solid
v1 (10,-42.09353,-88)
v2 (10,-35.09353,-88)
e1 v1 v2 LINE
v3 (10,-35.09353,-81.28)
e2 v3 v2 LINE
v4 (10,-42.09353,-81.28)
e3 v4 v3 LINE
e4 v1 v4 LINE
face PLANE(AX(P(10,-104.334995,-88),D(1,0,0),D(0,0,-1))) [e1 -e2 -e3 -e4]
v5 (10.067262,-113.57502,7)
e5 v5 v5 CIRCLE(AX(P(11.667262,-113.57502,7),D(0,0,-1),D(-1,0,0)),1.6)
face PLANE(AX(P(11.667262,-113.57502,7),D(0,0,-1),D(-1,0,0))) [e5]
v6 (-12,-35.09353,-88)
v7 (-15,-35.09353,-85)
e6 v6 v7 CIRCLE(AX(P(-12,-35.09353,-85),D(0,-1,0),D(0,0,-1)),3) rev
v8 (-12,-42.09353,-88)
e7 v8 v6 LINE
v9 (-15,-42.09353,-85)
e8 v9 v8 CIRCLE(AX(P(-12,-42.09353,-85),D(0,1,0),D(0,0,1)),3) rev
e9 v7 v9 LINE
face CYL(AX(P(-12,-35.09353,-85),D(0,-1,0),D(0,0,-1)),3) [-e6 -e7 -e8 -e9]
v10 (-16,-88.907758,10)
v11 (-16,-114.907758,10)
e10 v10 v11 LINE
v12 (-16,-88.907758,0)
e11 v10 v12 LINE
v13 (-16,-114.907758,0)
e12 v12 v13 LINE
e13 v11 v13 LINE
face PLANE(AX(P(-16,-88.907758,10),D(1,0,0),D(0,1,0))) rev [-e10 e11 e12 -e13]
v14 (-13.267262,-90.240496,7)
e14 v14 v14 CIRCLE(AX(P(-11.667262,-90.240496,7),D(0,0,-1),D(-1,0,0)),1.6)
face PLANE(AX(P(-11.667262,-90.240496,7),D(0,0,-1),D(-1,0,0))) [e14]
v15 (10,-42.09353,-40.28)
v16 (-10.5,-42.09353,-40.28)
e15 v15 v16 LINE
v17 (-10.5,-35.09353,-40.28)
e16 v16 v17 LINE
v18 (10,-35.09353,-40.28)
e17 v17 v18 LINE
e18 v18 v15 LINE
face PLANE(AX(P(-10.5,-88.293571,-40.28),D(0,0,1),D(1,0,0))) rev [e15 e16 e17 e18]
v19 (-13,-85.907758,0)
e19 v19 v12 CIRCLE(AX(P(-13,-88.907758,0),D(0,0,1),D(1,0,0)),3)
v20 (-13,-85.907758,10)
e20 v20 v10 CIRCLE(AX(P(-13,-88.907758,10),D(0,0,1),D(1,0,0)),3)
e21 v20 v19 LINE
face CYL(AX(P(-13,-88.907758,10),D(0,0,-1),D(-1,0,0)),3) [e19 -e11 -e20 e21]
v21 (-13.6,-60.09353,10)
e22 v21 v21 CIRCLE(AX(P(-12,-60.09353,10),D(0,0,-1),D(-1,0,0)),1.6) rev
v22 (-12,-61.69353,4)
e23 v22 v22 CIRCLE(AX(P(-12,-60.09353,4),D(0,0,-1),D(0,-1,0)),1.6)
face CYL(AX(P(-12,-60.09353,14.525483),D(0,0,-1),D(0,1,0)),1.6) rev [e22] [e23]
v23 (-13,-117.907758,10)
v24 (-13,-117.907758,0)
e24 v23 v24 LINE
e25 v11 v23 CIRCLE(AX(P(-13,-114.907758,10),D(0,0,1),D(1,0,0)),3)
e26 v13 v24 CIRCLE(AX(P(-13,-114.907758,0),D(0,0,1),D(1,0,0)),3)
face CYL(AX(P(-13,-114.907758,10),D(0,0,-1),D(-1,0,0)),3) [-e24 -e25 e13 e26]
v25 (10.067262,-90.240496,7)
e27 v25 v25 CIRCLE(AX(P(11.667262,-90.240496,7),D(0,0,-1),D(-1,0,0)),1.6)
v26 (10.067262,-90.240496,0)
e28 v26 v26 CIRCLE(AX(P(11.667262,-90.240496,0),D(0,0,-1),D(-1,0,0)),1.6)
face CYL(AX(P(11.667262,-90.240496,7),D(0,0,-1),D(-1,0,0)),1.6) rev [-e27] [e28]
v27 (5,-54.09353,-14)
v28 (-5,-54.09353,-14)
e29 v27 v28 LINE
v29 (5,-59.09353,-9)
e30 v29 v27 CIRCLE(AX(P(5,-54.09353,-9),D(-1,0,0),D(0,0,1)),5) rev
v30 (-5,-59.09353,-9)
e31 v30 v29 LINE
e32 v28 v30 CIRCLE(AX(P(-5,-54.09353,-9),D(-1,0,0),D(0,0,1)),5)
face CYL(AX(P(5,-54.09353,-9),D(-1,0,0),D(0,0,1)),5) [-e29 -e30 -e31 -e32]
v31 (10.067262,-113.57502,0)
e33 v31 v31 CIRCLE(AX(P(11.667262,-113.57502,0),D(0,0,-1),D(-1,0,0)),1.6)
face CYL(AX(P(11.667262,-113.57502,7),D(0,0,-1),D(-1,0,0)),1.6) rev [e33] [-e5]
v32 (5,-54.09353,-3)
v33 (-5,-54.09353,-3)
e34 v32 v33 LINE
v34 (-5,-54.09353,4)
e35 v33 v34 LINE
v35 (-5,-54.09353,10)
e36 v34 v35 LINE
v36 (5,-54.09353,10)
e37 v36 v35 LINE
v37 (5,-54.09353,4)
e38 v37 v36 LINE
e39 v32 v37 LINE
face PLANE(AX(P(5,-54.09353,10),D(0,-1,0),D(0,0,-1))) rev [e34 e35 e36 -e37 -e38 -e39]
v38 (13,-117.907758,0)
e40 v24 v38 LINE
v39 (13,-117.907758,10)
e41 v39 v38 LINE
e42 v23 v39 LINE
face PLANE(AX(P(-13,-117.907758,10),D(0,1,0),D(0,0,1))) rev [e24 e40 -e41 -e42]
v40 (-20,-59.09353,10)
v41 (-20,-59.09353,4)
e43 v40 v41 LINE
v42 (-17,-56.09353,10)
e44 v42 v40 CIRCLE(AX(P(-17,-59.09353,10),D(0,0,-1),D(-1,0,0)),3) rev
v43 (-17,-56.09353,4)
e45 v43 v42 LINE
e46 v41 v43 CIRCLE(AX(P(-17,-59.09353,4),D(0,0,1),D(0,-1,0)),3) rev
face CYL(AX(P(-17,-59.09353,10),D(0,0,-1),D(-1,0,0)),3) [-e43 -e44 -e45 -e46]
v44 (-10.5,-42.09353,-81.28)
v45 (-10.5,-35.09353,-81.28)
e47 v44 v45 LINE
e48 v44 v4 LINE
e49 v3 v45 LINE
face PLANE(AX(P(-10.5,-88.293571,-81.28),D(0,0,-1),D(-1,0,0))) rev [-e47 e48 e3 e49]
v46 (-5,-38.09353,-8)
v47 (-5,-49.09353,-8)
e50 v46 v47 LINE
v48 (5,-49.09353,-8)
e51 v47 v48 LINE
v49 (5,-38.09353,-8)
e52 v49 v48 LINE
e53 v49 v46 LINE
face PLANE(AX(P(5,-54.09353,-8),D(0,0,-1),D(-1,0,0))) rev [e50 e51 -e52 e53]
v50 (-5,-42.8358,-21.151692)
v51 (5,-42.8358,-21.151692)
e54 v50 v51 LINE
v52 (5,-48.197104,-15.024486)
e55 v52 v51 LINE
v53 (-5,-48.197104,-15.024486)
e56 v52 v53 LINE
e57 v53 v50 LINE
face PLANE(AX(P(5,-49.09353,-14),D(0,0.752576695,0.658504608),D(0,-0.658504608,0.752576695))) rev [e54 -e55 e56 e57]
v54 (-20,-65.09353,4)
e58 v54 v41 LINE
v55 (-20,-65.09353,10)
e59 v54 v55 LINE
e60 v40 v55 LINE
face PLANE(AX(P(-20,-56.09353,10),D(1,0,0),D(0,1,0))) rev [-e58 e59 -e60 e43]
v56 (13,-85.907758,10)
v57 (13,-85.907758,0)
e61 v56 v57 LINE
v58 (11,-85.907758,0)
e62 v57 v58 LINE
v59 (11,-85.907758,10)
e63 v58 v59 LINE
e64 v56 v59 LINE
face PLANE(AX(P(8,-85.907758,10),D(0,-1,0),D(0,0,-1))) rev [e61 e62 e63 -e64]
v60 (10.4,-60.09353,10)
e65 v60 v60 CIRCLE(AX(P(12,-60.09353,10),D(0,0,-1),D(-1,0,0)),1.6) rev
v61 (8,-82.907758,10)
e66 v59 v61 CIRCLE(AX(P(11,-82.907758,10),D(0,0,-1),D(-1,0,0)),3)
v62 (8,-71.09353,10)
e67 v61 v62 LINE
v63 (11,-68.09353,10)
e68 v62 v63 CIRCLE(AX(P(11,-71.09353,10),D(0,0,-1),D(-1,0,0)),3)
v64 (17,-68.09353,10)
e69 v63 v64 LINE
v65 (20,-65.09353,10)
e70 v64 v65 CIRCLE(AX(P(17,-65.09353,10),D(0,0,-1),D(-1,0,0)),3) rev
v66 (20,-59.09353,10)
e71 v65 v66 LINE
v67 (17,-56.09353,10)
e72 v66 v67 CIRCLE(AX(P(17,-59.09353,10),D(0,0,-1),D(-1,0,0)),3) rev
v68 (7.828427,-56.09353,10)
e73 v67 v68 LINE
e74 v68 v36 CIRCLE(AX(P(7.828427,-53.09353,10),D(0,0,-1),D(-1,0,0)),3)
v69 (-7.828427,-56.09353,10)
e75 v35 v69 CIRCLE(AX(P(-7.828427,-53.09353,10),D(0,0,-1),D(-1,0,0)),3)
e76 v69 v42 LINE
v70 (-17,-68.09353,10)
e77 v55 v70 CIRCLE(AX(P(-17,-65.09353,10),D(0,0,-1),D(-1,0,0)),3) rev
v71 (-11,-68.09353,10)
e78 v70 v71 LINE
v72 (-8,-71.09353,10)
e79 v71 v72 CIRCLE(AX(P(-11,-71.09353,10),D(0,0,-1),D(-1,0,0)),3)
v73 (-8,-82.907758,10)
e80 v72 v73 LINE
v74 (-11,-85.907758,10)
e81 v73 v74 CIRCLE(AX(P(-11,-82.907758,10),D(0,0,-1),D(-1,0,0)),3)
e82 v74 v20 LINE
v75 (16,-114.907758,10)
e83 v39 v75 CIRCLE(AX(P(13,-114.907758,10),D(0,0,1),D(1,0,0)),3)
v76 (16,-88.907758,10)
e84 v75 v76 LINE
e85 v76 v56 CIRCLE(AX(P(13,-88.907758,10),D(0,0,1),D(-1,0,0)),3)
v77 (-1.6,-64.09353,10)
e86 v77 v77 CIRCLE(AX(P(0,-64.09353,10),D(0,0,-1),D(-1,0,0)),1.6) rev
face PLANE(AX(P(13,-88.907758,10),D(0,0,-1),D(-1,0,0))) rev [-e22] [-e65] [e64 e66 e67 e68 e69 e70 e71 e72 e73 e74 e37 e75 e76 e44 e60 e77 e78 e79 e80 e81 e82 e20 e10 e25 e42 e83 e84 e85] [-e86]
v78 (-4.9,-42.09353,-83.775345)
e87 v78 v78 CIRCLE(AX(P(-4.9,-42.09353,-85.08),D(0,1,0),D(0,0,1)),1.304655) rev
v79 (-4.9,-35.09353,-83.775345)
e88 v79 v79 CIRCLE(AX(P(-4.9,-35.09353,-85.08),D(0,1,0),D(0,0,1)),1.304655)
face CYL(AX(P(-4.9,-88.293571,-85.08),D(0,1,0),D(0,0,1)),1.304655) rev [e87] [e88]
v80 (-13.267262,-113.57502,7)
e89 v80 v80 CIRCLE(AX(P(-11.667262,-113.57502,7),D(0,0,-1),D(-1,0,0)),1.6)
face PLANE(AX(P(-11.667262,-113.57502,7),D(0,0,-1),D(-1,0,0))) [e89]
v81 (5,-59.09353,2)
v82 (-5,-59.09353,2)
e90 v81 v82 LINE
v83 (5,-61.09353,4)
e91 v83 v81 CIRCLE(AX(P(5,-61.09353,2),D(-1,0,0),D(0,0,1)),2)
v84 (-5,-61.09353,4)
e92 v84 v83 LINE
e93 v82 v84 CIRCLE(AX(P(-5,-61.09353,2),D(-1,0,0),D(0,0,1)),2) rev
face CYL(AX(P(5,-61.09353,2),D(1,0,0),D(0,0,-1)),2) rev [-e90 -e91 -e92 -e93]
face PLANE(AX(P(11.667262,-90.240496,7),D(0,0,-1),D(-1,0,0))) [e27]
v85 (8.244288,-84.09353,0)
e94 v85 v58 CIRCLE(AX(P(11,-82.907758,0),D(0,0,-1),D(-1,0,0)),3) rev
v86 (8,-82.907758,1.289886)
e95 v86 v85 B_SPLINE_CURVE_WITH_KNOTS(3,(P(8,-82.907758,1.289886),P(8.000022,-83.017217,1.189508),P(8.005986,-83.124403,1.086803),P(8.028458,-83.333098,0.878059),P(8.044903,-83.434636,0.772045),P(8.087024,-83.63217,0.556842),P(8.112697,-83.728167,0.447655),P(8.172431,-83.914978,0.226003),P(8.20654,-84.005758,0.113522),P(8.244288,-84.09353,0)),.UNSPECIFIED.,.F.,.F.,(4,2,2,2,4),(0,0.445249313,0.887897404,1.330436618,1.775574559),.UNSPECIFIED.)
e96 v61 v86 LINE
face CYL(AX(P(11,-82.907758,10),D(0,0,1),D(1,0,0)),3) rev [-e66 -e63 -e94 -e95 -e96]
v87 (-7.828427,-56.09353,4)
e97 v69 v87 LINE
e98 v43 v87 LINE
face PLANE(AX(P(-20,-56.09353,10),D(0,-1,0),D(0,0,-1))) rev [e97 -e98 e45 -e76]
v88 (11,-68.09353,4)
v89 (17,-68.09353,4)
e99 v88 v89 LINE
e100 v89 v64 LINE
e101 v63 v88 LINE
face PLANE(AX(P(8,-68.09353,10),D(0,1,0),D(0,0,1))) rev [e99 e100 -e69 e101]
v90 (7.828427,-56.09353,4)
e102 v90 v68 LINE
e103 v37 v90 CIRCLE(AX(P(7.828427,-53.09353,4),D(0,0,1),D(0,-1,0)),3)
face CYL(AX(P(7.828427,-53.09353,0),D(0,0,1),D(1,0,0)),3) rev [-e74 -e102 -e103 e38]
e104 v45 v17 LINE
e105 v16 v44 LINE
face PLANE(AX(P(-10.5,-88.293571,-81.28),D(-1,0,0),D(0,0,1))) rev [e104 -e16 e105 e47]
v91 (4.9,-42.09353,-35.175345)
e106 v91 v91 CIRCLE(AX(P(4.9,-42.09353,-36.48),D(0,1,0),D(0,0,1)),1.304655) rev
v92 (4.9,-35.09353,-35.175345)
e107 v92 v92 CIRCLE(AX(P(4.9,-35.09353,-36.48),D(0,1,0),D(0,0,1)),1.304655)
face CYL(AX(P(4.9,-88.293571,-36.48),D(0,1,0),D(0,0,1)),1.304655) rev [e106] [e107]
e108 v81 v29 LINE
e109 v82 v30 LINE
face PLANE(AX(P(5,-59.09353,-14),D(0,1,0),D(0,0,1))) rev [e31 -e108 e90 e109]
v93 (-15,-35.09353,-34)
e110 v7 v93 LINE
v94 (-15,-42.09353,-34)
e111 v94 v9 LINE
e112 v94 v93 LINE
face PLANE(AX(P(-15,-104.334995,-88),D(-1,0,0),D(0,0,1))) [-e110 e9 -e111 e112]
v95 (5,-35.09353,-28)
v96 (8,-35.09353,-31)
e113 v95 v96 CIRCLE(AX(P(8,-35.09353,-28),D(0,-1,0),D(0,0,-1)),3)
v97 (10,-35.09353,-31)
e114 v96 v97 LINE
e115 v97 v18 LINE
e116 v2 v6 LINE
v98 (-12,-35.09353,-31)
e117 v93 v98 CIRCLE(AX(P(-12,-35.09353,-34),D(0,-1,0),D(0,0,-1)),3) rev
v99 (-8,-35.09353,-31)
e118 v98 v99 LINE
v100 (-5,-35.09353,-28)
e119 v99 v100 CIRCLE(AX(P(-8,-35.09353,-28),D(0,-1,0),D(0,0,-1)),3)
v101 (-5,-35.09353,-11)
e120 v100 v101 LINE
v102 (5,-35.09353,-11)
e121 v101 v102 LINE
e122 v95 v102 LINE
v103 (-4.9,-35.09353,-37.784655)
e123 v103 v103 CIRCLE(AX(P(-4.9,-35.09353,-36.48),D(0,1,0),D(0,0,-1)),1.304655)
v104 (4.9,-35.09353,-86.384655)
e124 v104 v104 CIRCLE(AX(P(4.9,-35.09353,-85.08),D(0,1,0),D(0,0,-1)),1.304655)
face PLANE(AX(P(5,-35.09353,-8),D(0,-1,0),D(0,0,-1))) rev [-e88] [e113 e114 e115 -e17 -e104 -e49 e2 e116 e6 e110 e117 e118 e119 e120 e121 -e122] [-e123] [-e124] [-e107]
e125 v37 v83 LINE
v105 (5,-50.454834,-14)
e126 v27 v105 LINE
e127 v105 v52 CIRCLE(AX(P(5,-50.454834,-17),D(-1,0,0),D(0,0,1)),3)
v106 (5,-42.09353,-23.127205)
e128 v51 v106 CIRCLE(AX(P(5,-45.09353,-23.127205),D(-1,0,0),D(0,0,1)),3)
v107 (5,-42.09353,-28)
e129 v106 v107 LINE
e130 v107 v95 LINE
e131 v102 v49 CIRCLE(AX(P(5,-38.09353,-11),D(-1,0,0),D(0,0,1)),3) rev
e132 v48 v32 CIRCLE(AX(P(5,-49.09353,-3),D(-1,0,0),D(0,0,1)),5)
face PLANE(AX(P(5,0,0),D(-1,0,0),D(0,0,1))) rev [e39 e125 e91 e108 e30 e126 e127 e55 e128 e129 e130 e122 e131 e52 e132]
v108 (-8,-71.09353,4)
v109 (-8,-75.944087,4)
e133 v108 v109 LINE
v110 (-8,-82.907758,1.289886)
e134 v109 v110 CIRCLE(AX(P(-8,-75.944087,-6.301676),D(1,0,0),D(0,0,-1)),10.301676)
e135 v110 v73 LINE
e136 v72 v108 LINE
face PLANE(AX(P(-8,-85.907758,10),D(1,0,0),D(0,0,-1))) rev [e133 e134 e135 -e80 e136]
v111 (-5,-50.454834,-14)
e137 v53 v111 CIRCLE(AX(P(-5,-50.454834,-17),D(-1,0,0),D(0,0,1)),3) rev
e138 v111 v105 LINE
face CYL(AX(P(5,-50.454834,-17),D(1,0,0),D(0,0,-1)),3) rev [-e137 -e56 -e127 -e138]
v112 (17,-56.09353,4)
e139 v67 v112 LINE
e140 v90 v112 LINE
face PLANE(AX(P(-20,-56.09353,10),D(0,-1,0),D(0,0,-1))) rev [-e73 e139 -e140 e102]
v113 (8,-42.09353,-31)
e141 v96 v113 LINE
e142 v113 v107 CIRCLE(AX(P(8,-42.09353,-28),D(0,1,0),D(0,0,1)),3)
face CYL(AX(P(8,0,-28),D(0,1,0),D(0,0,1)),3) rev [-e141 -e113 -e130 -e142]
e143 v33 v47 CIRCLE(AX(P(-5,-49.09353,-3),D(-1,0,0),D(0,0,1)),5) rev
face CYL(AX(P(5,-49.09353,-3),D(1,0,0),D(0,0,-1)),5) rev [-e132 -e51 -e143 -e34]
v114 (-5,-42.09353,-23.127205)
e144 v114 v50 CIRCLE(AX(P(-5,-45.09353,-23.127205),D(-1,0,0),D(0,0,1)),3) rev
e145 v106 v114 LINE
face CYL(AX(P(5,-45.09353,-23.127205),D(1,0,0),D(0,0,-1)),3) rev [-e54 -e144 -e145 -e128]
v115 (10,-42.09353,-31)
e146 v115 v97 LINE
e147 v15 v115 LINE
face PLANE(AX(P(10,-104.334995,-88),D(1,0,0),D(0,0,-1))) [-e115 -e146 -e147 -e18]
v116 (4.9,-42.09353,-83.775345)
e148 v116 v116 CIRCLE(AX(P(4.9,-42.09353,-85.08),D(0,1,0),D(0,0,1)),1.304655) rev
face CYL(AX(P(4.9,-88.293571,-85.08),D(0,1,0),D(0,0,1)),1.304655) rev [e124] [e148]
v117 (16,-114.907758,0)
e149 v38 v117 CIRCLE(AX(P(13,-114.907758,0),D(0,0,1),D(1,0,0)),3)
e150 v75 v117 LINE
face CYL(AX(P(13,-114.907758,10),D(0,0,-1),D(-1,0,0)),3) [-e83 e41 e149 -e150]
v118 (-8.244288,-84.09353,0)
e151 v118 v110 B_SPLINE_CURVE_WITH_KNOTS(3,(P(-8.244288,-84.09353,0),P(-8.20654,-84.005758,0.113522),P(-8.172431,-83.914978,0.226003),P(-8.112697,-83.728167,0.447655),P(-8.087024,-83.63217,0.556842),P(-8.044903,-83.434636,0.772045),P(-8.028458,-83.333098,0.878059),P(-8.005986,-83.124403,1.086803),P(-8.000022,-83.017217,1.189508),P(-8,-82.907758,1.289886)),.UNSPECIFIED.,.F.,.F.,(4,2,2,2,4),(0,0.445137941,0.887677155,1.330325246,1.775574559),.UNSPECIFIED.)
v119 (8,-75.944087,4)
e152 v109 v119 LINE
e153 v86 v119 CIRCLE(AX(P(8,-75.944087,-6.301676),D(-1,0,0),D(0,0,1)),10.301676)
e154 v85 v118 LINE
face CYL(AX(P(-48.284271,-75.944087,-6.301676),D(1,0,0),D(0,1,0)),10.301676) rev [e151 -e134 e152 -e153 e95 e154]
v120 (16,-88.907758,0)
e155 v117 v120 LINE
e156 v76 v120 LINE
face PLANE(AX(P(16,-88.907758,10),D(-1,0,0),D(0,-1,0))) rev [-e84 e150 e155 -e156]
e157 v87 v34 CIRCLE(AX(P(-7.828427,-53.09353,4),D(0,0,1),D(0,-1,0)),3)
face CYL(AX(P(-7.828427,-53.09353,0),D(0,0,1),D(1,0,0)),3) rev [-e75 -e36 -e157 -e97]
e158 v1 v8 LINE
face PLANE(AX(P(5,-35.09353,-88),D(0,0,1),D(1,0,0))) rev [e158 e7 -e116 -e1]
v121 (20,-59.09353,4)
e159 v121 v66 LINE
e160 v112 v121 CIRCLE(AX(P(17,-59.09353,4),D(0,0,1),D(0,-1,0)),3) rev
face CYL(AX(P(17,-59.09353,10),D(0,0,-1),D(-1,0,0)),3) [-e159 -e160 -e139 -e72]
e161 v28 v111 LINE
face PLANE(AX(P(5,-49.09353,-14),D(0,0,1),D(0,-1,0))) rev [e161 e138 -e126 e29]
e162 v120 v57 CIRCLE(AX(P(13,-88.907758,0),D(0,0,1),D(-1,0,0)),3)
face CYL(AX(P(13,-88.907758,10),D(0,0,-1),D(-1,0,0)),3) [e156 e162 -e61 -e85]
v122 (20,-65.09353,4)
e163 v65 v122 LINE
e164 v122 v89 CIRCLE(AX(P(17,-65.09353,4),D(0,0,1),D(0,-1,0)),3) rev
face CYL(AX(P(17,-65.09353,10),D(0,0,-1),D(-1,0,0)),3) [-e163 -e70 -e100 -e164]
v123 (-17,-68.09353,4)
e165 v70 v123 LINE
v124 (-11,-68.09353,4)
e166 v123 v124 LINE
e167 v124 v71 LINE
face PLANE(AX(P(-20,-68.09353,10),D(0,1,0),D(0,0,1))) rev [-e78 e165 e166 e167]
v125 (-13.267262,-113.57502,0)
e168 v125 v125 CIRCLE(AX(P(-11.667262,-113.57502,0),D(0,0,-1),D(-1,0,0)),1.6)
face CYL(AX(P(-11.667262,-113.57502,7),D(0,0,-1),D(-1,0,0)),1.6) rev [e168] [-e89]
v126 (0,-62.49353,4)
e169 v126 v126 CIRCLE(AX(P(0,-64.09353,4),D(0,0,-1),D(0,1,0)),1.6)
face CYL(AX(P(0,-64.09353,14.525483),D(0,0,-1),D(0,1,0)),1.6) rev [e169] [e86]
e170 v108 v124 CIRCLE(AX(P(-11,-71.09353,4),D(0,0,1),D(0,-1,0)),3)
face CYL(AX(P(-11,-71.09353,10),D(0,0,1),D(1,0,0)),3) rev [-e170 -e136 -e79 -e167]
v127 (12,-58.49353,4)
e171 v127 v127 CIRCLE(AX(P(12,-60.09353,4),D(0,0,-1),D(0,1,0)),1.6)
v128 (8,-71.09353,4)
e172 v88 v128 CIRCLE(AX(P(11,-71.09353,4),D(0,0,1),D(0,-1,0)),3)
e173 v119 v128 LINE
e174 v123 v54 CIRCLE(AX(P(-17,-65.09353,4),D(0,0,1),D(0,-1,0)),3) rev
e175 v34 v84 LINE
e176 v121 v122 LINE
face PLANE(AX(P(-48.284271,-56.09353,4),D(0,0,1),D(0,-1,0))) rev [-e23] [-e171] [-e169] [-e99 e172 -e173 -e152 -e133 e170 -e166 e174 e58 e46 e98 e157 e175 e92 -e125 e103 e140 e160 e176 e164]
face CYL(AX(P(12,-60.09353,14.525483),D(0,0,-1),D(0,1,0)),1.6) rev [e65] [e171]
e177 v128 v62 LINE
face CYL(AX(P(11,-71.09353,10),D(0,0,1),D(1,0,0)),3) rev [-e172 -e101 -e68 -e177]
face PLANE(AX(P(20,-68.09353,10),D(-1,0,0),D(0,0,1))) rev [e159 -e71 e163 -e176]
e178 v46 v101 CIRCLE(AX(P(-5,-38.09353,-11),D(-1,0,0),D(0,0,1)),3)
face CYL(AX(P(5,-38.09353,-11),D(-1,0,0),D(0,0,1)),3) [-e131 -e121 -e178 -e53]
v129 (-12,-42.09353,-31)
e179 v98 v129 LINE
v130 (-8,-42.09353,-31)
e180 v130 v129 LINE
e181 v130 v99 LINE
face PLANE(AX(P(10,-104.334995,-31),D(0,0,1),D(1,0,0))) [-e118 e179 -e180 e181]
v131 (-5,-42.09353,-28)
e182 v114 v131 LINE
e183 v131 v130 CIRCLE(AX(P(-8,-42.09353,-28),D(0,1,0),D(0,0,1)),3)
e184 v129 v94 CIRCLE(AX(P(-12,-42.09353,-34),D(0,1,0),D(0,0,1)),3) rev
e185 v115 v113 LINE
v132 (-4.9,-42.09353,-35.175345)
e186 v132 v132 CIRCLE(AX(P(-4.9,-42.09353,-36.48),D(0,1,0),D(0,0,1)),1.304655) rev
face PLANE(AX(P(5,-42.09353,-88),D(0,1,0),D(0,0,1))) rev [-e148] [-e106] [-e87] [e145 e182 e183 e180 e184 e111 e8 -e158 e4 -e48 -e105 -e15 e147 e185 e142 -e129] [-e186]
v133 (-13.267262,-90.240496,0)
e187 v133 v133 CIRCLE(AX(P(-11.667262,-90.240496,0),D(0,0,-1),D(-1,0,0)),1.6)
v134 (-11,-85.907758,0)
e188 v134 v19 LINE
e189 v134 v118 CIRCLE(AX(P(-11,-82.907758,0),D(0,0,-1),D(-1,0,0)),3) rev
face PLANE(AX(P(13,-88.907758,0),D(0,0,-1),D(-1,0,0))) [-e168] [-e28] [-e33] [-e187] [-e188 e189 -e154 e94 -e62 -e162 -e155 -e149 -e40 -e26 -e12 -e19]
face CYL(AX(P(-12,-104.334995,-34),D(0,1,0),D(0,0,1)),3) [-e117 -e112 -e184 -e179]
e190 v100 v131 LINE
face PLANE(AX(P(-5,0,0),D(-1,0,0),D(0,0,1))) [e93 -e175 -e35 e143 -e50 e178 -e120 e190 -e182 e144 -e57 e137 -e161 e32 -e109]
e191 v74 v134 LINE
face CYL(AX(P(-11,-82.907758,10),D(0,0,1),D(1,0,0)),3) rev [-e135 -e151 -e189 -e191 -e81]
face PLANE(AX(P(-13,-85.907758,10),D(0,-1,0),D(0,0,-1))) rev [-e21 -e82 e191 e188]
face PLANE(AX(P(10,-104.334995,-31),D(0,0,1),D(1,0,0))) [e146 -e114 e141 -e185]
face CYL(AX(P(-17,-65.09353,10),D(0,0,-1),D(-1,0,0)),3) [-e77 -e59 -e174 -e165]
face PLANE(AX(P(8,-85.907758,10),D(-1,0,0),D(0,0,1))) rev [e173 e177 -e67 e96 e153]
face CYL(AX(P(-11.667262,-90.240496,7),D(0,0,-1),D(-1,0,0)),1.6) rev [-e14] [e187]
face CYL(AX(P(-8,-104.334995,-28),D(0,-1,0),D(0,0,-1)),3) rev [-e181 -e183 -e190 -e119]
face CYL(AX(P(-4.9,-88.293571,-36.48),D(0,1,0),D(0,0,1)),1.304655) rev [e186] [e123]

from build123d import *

# Parameters (mm, degrees)
BOSS_EXTRUDE1_DEPTH = 10
CUT_EXTRUDE1_REACH  = 126.909
FILLET1_R           = 3
SKETCH3_R           = 1.6
CUT_EXTRUDE2_DEPTH  = 6
SKETCH4_R           = 1.6
CUT_EXTRUDE3_DEPTH  = 7
BOSS_EXTRUDE2_DEPTH = 5
FILLET2_R           = 3
FILLET3_R           = 2
FILLET4_R           = 5
FILLET5_R           = 3
SKETCH7_W           = 25
SKETCH7_H           = 57
BOSS_EXTRUDE3_DEPTH = 7
SKETCH8_R           = 1.304654563
SKETCH8_W           = 21.294220064
SKETCH8_H           = 41
CUT_EXTRUDE4_DEPTH  = 7
FILLET6_R           = 3


with BuildPart() as part:
    # Sketch1 → Boss-Extrude1 (new body)
    with BuildSketch(Plane.XY):
        with BuildLine():
            Line((-13, -85.907758216), (-8, -85.907758216))
            Line((-8, -85.907758216), (-8, -68.093529717))
            Line((-8, -68.093529717), (-20, -68.093529717))
            Line((-20, -68.093529717), (-20, -56.093529717))
            Line((-20, -56.093529717), (20, -56.093529717))
            Line((20, -56.093529717), (20, -68.093529717))
            Line((20, -68.093529717), (8, -68.093529717))
            Line((8, -68.093529717), (8, -85.907758216))
            Line((8, -85.907758216), (13, -85.907758216))
            ThreePointArc((13, -85.907758216), (15.121320344, -86.786437873), (16, -88.907758216))
            Line((16, -88.907758216), (16, -114.907758216))
            ThreePointArc((16, -114.907758216), (15.121320344, -117.02907856), (13, -117.907758216))
            Line((13, -117.907758216), (-13, -117.907758216))
            ThreePointArc((-13, -117.907758216), (-15.121320344, -117.02907856), (-16, -114.907758216))
            Line((-16, -114.907758216), (-16, -88.907758216))
            ThreePointArc((-16, -88.907758216), (-15.121320344, -86.786437873), (-13, -85.907758216))
        make_face()
    extrude(amount=BOSS_EXTRUDE1_DEPTH)

    # Cut-Extrude1: up to this face of the body (flat: up to its plane)
    cut_extrude1_end = Plane(part.part.faces().sort_by_distance((-20, -62.093529717, 5))[0])
    # Sketch2 → Cut-Extrude1 (cut, up to the picked face)
    with BuildSketch(Plane(origin=(20, 0, 0), x_dir=(0, 0, -1), z_dir=(1, 0, 0)), mode=Mode.PRIVATE) as cut_extrude1_sk1:
        with BuildLine():
            Line((-4, -56.093529717), (-4, -75.944087362))
            ThreePointArc((-4, -75.944087362), (-2.946090025, -80.483178975), (0, -84.093529717))
            Line((0, -84.093529717), (0, -56.093529717))
            Line((0, -56.093529717), (-4, -56.093529717))
        make_face()
    cut_extrude1_tool1 = split(extrude(cut_extrude1_sk1.sketch, amount=-CUT_EXTRUDE1_REACH, mode=Mode.PRIVATE), bisect_by=cut_extrude1_end, keep=Keep.BOTH, mode=Mode.PRIVATE)
    add(cut_extrude1_tool1.solids().sort_by(Axis((20, -68.93128, 1.917617), (-1, 0, 0)))[0], mode=Mode.SUBTRACT)

    # Fillet1
    # the kernel refuses this fillet: 3 mm, written as the material it adds along each edge
    with BuildSketch(Plane(origin=(-8, -68.093529717, 4), x_dir=(0, -1, 0), z_dir=(0, 0, 1))) as fillet1_piece_1:
        with BuildLine():
            CenterArc((FILLET1_R, -FILLET1_R), FILLET1_R, 90, 90)
            Line((0, -FILLET1_R), (0, 0))
            Line((0, 0), (FILLET1_R, 0))
        make_face()
    extrude(amount=6)
    with BuildSketch(Plane(origin=(8, -68.093529717, 4), x_dir=(0, -1, 0), z_dir=(0, 0, 1))) as fillet1_piece_2:
        with BuildLine():
            CenterArc((FILLET1_R, FILLET1_R), FILLET1_R, 180, 90)
            Line((0, FILLET1_R), (0, 0))
            Line((0, 0), (FILLET1_R, 0))
        make_face()
    extrude(amount=6)
    with BuildSketch(Plane(origin=(-8, -85.907758216, 0), x_dir=(-1, 0, 0), z_dir=(0, 0, 1))) as fillet1_piece_3_section:
        with BuildLine():
            CenterArc((FILLET1_R, -FILLET1_R), FILLET1_R, 90, 90)
            Line((0, -FILLET1_R), (0, 0))
            Line((0, 0), (FILLET1_R, 0))
        make_face()
    fillet1_piece_3 = extrude(amount=10, mode=Mode.PRIVATE)
    fillet1_piece_3 = fillet1_piece_3 - Plane(origin=(-8.681614659, -75.944087362, -6.301676338), x_dir=(0, 0, 1), z_dir=(1, 0, 0)) * Cylinder(10.301676338, 32, mode=Mode.PRIVATE)
    add(fillet1_piece_3)
    with BuildSketch(Plane(origin=(8, -85.907758216, 0), x_dir=(1, 0, 0), z_dir=(0, 0, 1))) as fillet1_piece_4_section:
        with BuildLine():
            CenterArc((FILLET1_R, FILLET1_R), FILLET1_R, 180, 90)
            Line((0, FILLET1_R), (0, 0))
            Line((0, 0), (FILLET1_R, 0))
        make_face()
    fillet1_piece_4 = extrude(amount=10, mode=Mode.PRIVATE)
    fillet1_piece_4 = fillet1_piece_4 - Plane(origin=(8.68161466, -75.944087362, -6.301676338), x_dir=(0, 0, 1), z_dir=(1, 0, 0)) * Cylinder(10.301676338, 32, mode=Mode.PRIVATE)
    add(fillet1_piece_4)
    # the kernel refuses this fillet: 3 mm, written as the material it takes off along each edge
    with BuildSketch(Plane(origin=(-20, -68.093529717, -3.5), x_dir=(0, 1, 0), z_dir=(0, 0, 1)), Plane(origin=(-20, -56.093529717, -3.5), x_dir=(1, 0, 0), z_dir=(0, 0, 1)), Plane(origin=(20, -56.093529717, -3.5), x_dir=(0, -1, 0), z_dir=(0, 0, 1)), Plane(origin=(20, -68.093529717, -3.5), x_dir=(-1, 0, 0), z_dir=(0, 0, 1))) as fillet1_2_piece_1:
        with BuildLine():
            CenterArc((FILLET1_R, -FILLET1_R), FILLET1_R, 90, 90)
            Line((0, -FILLET1_R), (0, 0))
            Line((0, 0), (FILLET1_R, 0))
        make_face()
    extrude(amount=21, mode=Mode.SUBTRACT)

    # Sketch3 → Cut-Extrude2 (cut)
    with BuildSketch(Plane(origin=(0, 0, 4), x_dir=(-1, 0, 0), z_dir=(0, 0, -1))):
        with Locations(Location((-12, -60.093529717, 0), (0, 0, 90))):
            Circle(SKETCH3_R)
        with Locations(Location((0, -64.093529717, 0), (0, 0, 90))):
            Circle(SKETCH3_R)
        with Locations((12, -60.093529717)):
            Circle(SKETCH3_R)
    extrude(amount=-CUT_EXTRUDE2_DEPTH, mode=Mode.SUBTRACT)

    # Sketch4 → Cut-Extrude3 (cut)
    with BuildSketch(Plane(origin=(0, 0, 0), x_dir=(-1, 0, 0), z_dir=(0, 0, -1))):
        with Locations((11.66726189, -90.240496327)):
            Circle(SKETCH4_R)
        with Locations((-11.66726189, -90.240496327)):
            Circle(SKETCH4_R)
        with Locations((-11.66726189, -113.575020106)):
            Circle(SKETCH4_R)
        with Locations((11.66726189, -113.575020106)):
            Circle(SKETCH4_R)
    extrude(amount=-CUT_EXTRUDE3_DEPTH, mode=Mode.SUBTRACT)

    # Sketch5 → Boss-Extrude2 (add, symmetric)
    with BuildSketch(Plane(origin=(0, 0, 0), x_dir=(0, 0, -1), z_dir=(1, 0, 0))):
        Polygon((-10, -59.093529717), (-10, -54.093529717), (8, -54.093529717), (8, -35.093529717), (88, -35.093529717), (88, -42.093529717), (22, -42.093529717), (14, -49.093529717), (14, -59.093529717), align=None)
    extrude(amount=BOSS_EXTRUDE2_DEPTH, both=True)

    # Fillet2
    # the kernel refuses this fillet: 3 mm, written as the material it adds along each edge
    with BuildSketch(Plane(origin=(-5, -56.093529717, 4), x_dir=(-1, 0, 0), z_dir=(0, 0, 1))) as fillet2_piece_1:
        with BuildLine():
            CenterArc((2.828427125, -3), FILLET2_R, 90, 70.528779366)
            Line((0, -2), (-0.056568542, -1.98))
            ThreePointArc((-0.056568542, -1.98), (-0.06, -1), (-0.06, 0))
            Line((-0.06, 0), (0, 0.06))
            Line((0, 0.06), (2.828427125, 0.06))
            Line((2.828427125, 0.06), (2.828427125, 0))
        make_face()
    extrude(amount=6)
    with BuildSketch(Plane(origin=(5, -56.093529717, 4), x_dir=(1, 0, 0), z_dir=(0, 0, 1))) as fillet2_piece_2:
        with BuildLine():
            CenterArc((2.828427125, 3), FILLET2_R, 199.471220634, 70.528779366)
            Line((0, 2), (-0.056568542, 1.98))
            ThreePointArc((-0.056568542, 1.98), (-0.06, 1), (-0.06, 0))
            Line((-0.06, 0), (0, -0.06))
            Line((0, -0.06), (2.828427125, -0.06))
            Line((2.828427125, -0.06), (2.828427125, 0))
        make_face()
    extrude(amount=6)

    # Fillet3
    fillet3_edges = [part.edges().sort_by_distance(p)[0] for p in [
        (0, -59.093529717, 4),
    ]]
    fillet(fillet3_edges, radius=FILLET3_R)

    # Fillet4
    fillet4_edges = [part.edges().sort_by_distance(p)[0] for p in [
        (0, -59.093529717, -14),
        (0, -54.093529717, -8),
    ]]
    fillet(fillet4_edges, radius=FILLET4_R)

    # Fillet5
    fillet5_edges = [part.edges().sort_by_distance(p)[0] for p in [
        (0, -35.093529717, -8),
    ]]
    fillet(fillet5_edges, radius=FILLET5_R)

    # Sketch7 → Boss-Extrude3 (add)
    with BuildSketch(Plane(origin=(0, -35.093529717, 0), x_dir=(1, 0, 0), z_dir=(0, 1, 0))):
        with Locations((-2.5, 59.5)):
            Rectangle(SKETCH7_W, SKETCH7_H)
    extrude(amount=-BOSS_EXTRUDE3_DEPTH)

    # Sketch8 → Cut-Extrude4 (cut)
    with BuildSketch(Plane(origin=(0, -35.093529717, 0), x_dir=(1, 0, 0), z_dir=(0, 1, 0))):
        with Locations(Location((-4.9, 85.08, 0), (0, 0, 270))):
            Circle(SKETCH8_R)
        with Locations(Location((4.9, 85.08, 0), (0, 0, 270))):
            Circle(SKETCH8_R)
        with Locations(Location((4.9, 36.48, 0), (0, 0, 270))):
            Circle(SKETCH8_R)
        with Locations(Location((-4.9, 36.48, 0), (0, 0, 270))):
            Circle(SKETCH8_R)
        with Locations((0.147110032, 60.78)):
            Rectangle(SKETCH8_W, SKETCH8_H)
    extrude(amount=-CUT_EXTRUDE4_DEPTH, mode=Mode.SUBTRACT)

    # Fillet6
    fillet6_edges = [part.edges().sort_by_distance(p)[0] for p in [
        (0, -49.093529717, -14),
        (0, -42.093529717, -22),
        (5, -38.593529717, -31),
        (-5, -38.593529717, -31),
        (-15, -38.593529717, -31),
        (-15, -38.593529717, -88),
    ]]
    fillet(fillet6_edges, radius=FILLET6_R)


solid = part.part
